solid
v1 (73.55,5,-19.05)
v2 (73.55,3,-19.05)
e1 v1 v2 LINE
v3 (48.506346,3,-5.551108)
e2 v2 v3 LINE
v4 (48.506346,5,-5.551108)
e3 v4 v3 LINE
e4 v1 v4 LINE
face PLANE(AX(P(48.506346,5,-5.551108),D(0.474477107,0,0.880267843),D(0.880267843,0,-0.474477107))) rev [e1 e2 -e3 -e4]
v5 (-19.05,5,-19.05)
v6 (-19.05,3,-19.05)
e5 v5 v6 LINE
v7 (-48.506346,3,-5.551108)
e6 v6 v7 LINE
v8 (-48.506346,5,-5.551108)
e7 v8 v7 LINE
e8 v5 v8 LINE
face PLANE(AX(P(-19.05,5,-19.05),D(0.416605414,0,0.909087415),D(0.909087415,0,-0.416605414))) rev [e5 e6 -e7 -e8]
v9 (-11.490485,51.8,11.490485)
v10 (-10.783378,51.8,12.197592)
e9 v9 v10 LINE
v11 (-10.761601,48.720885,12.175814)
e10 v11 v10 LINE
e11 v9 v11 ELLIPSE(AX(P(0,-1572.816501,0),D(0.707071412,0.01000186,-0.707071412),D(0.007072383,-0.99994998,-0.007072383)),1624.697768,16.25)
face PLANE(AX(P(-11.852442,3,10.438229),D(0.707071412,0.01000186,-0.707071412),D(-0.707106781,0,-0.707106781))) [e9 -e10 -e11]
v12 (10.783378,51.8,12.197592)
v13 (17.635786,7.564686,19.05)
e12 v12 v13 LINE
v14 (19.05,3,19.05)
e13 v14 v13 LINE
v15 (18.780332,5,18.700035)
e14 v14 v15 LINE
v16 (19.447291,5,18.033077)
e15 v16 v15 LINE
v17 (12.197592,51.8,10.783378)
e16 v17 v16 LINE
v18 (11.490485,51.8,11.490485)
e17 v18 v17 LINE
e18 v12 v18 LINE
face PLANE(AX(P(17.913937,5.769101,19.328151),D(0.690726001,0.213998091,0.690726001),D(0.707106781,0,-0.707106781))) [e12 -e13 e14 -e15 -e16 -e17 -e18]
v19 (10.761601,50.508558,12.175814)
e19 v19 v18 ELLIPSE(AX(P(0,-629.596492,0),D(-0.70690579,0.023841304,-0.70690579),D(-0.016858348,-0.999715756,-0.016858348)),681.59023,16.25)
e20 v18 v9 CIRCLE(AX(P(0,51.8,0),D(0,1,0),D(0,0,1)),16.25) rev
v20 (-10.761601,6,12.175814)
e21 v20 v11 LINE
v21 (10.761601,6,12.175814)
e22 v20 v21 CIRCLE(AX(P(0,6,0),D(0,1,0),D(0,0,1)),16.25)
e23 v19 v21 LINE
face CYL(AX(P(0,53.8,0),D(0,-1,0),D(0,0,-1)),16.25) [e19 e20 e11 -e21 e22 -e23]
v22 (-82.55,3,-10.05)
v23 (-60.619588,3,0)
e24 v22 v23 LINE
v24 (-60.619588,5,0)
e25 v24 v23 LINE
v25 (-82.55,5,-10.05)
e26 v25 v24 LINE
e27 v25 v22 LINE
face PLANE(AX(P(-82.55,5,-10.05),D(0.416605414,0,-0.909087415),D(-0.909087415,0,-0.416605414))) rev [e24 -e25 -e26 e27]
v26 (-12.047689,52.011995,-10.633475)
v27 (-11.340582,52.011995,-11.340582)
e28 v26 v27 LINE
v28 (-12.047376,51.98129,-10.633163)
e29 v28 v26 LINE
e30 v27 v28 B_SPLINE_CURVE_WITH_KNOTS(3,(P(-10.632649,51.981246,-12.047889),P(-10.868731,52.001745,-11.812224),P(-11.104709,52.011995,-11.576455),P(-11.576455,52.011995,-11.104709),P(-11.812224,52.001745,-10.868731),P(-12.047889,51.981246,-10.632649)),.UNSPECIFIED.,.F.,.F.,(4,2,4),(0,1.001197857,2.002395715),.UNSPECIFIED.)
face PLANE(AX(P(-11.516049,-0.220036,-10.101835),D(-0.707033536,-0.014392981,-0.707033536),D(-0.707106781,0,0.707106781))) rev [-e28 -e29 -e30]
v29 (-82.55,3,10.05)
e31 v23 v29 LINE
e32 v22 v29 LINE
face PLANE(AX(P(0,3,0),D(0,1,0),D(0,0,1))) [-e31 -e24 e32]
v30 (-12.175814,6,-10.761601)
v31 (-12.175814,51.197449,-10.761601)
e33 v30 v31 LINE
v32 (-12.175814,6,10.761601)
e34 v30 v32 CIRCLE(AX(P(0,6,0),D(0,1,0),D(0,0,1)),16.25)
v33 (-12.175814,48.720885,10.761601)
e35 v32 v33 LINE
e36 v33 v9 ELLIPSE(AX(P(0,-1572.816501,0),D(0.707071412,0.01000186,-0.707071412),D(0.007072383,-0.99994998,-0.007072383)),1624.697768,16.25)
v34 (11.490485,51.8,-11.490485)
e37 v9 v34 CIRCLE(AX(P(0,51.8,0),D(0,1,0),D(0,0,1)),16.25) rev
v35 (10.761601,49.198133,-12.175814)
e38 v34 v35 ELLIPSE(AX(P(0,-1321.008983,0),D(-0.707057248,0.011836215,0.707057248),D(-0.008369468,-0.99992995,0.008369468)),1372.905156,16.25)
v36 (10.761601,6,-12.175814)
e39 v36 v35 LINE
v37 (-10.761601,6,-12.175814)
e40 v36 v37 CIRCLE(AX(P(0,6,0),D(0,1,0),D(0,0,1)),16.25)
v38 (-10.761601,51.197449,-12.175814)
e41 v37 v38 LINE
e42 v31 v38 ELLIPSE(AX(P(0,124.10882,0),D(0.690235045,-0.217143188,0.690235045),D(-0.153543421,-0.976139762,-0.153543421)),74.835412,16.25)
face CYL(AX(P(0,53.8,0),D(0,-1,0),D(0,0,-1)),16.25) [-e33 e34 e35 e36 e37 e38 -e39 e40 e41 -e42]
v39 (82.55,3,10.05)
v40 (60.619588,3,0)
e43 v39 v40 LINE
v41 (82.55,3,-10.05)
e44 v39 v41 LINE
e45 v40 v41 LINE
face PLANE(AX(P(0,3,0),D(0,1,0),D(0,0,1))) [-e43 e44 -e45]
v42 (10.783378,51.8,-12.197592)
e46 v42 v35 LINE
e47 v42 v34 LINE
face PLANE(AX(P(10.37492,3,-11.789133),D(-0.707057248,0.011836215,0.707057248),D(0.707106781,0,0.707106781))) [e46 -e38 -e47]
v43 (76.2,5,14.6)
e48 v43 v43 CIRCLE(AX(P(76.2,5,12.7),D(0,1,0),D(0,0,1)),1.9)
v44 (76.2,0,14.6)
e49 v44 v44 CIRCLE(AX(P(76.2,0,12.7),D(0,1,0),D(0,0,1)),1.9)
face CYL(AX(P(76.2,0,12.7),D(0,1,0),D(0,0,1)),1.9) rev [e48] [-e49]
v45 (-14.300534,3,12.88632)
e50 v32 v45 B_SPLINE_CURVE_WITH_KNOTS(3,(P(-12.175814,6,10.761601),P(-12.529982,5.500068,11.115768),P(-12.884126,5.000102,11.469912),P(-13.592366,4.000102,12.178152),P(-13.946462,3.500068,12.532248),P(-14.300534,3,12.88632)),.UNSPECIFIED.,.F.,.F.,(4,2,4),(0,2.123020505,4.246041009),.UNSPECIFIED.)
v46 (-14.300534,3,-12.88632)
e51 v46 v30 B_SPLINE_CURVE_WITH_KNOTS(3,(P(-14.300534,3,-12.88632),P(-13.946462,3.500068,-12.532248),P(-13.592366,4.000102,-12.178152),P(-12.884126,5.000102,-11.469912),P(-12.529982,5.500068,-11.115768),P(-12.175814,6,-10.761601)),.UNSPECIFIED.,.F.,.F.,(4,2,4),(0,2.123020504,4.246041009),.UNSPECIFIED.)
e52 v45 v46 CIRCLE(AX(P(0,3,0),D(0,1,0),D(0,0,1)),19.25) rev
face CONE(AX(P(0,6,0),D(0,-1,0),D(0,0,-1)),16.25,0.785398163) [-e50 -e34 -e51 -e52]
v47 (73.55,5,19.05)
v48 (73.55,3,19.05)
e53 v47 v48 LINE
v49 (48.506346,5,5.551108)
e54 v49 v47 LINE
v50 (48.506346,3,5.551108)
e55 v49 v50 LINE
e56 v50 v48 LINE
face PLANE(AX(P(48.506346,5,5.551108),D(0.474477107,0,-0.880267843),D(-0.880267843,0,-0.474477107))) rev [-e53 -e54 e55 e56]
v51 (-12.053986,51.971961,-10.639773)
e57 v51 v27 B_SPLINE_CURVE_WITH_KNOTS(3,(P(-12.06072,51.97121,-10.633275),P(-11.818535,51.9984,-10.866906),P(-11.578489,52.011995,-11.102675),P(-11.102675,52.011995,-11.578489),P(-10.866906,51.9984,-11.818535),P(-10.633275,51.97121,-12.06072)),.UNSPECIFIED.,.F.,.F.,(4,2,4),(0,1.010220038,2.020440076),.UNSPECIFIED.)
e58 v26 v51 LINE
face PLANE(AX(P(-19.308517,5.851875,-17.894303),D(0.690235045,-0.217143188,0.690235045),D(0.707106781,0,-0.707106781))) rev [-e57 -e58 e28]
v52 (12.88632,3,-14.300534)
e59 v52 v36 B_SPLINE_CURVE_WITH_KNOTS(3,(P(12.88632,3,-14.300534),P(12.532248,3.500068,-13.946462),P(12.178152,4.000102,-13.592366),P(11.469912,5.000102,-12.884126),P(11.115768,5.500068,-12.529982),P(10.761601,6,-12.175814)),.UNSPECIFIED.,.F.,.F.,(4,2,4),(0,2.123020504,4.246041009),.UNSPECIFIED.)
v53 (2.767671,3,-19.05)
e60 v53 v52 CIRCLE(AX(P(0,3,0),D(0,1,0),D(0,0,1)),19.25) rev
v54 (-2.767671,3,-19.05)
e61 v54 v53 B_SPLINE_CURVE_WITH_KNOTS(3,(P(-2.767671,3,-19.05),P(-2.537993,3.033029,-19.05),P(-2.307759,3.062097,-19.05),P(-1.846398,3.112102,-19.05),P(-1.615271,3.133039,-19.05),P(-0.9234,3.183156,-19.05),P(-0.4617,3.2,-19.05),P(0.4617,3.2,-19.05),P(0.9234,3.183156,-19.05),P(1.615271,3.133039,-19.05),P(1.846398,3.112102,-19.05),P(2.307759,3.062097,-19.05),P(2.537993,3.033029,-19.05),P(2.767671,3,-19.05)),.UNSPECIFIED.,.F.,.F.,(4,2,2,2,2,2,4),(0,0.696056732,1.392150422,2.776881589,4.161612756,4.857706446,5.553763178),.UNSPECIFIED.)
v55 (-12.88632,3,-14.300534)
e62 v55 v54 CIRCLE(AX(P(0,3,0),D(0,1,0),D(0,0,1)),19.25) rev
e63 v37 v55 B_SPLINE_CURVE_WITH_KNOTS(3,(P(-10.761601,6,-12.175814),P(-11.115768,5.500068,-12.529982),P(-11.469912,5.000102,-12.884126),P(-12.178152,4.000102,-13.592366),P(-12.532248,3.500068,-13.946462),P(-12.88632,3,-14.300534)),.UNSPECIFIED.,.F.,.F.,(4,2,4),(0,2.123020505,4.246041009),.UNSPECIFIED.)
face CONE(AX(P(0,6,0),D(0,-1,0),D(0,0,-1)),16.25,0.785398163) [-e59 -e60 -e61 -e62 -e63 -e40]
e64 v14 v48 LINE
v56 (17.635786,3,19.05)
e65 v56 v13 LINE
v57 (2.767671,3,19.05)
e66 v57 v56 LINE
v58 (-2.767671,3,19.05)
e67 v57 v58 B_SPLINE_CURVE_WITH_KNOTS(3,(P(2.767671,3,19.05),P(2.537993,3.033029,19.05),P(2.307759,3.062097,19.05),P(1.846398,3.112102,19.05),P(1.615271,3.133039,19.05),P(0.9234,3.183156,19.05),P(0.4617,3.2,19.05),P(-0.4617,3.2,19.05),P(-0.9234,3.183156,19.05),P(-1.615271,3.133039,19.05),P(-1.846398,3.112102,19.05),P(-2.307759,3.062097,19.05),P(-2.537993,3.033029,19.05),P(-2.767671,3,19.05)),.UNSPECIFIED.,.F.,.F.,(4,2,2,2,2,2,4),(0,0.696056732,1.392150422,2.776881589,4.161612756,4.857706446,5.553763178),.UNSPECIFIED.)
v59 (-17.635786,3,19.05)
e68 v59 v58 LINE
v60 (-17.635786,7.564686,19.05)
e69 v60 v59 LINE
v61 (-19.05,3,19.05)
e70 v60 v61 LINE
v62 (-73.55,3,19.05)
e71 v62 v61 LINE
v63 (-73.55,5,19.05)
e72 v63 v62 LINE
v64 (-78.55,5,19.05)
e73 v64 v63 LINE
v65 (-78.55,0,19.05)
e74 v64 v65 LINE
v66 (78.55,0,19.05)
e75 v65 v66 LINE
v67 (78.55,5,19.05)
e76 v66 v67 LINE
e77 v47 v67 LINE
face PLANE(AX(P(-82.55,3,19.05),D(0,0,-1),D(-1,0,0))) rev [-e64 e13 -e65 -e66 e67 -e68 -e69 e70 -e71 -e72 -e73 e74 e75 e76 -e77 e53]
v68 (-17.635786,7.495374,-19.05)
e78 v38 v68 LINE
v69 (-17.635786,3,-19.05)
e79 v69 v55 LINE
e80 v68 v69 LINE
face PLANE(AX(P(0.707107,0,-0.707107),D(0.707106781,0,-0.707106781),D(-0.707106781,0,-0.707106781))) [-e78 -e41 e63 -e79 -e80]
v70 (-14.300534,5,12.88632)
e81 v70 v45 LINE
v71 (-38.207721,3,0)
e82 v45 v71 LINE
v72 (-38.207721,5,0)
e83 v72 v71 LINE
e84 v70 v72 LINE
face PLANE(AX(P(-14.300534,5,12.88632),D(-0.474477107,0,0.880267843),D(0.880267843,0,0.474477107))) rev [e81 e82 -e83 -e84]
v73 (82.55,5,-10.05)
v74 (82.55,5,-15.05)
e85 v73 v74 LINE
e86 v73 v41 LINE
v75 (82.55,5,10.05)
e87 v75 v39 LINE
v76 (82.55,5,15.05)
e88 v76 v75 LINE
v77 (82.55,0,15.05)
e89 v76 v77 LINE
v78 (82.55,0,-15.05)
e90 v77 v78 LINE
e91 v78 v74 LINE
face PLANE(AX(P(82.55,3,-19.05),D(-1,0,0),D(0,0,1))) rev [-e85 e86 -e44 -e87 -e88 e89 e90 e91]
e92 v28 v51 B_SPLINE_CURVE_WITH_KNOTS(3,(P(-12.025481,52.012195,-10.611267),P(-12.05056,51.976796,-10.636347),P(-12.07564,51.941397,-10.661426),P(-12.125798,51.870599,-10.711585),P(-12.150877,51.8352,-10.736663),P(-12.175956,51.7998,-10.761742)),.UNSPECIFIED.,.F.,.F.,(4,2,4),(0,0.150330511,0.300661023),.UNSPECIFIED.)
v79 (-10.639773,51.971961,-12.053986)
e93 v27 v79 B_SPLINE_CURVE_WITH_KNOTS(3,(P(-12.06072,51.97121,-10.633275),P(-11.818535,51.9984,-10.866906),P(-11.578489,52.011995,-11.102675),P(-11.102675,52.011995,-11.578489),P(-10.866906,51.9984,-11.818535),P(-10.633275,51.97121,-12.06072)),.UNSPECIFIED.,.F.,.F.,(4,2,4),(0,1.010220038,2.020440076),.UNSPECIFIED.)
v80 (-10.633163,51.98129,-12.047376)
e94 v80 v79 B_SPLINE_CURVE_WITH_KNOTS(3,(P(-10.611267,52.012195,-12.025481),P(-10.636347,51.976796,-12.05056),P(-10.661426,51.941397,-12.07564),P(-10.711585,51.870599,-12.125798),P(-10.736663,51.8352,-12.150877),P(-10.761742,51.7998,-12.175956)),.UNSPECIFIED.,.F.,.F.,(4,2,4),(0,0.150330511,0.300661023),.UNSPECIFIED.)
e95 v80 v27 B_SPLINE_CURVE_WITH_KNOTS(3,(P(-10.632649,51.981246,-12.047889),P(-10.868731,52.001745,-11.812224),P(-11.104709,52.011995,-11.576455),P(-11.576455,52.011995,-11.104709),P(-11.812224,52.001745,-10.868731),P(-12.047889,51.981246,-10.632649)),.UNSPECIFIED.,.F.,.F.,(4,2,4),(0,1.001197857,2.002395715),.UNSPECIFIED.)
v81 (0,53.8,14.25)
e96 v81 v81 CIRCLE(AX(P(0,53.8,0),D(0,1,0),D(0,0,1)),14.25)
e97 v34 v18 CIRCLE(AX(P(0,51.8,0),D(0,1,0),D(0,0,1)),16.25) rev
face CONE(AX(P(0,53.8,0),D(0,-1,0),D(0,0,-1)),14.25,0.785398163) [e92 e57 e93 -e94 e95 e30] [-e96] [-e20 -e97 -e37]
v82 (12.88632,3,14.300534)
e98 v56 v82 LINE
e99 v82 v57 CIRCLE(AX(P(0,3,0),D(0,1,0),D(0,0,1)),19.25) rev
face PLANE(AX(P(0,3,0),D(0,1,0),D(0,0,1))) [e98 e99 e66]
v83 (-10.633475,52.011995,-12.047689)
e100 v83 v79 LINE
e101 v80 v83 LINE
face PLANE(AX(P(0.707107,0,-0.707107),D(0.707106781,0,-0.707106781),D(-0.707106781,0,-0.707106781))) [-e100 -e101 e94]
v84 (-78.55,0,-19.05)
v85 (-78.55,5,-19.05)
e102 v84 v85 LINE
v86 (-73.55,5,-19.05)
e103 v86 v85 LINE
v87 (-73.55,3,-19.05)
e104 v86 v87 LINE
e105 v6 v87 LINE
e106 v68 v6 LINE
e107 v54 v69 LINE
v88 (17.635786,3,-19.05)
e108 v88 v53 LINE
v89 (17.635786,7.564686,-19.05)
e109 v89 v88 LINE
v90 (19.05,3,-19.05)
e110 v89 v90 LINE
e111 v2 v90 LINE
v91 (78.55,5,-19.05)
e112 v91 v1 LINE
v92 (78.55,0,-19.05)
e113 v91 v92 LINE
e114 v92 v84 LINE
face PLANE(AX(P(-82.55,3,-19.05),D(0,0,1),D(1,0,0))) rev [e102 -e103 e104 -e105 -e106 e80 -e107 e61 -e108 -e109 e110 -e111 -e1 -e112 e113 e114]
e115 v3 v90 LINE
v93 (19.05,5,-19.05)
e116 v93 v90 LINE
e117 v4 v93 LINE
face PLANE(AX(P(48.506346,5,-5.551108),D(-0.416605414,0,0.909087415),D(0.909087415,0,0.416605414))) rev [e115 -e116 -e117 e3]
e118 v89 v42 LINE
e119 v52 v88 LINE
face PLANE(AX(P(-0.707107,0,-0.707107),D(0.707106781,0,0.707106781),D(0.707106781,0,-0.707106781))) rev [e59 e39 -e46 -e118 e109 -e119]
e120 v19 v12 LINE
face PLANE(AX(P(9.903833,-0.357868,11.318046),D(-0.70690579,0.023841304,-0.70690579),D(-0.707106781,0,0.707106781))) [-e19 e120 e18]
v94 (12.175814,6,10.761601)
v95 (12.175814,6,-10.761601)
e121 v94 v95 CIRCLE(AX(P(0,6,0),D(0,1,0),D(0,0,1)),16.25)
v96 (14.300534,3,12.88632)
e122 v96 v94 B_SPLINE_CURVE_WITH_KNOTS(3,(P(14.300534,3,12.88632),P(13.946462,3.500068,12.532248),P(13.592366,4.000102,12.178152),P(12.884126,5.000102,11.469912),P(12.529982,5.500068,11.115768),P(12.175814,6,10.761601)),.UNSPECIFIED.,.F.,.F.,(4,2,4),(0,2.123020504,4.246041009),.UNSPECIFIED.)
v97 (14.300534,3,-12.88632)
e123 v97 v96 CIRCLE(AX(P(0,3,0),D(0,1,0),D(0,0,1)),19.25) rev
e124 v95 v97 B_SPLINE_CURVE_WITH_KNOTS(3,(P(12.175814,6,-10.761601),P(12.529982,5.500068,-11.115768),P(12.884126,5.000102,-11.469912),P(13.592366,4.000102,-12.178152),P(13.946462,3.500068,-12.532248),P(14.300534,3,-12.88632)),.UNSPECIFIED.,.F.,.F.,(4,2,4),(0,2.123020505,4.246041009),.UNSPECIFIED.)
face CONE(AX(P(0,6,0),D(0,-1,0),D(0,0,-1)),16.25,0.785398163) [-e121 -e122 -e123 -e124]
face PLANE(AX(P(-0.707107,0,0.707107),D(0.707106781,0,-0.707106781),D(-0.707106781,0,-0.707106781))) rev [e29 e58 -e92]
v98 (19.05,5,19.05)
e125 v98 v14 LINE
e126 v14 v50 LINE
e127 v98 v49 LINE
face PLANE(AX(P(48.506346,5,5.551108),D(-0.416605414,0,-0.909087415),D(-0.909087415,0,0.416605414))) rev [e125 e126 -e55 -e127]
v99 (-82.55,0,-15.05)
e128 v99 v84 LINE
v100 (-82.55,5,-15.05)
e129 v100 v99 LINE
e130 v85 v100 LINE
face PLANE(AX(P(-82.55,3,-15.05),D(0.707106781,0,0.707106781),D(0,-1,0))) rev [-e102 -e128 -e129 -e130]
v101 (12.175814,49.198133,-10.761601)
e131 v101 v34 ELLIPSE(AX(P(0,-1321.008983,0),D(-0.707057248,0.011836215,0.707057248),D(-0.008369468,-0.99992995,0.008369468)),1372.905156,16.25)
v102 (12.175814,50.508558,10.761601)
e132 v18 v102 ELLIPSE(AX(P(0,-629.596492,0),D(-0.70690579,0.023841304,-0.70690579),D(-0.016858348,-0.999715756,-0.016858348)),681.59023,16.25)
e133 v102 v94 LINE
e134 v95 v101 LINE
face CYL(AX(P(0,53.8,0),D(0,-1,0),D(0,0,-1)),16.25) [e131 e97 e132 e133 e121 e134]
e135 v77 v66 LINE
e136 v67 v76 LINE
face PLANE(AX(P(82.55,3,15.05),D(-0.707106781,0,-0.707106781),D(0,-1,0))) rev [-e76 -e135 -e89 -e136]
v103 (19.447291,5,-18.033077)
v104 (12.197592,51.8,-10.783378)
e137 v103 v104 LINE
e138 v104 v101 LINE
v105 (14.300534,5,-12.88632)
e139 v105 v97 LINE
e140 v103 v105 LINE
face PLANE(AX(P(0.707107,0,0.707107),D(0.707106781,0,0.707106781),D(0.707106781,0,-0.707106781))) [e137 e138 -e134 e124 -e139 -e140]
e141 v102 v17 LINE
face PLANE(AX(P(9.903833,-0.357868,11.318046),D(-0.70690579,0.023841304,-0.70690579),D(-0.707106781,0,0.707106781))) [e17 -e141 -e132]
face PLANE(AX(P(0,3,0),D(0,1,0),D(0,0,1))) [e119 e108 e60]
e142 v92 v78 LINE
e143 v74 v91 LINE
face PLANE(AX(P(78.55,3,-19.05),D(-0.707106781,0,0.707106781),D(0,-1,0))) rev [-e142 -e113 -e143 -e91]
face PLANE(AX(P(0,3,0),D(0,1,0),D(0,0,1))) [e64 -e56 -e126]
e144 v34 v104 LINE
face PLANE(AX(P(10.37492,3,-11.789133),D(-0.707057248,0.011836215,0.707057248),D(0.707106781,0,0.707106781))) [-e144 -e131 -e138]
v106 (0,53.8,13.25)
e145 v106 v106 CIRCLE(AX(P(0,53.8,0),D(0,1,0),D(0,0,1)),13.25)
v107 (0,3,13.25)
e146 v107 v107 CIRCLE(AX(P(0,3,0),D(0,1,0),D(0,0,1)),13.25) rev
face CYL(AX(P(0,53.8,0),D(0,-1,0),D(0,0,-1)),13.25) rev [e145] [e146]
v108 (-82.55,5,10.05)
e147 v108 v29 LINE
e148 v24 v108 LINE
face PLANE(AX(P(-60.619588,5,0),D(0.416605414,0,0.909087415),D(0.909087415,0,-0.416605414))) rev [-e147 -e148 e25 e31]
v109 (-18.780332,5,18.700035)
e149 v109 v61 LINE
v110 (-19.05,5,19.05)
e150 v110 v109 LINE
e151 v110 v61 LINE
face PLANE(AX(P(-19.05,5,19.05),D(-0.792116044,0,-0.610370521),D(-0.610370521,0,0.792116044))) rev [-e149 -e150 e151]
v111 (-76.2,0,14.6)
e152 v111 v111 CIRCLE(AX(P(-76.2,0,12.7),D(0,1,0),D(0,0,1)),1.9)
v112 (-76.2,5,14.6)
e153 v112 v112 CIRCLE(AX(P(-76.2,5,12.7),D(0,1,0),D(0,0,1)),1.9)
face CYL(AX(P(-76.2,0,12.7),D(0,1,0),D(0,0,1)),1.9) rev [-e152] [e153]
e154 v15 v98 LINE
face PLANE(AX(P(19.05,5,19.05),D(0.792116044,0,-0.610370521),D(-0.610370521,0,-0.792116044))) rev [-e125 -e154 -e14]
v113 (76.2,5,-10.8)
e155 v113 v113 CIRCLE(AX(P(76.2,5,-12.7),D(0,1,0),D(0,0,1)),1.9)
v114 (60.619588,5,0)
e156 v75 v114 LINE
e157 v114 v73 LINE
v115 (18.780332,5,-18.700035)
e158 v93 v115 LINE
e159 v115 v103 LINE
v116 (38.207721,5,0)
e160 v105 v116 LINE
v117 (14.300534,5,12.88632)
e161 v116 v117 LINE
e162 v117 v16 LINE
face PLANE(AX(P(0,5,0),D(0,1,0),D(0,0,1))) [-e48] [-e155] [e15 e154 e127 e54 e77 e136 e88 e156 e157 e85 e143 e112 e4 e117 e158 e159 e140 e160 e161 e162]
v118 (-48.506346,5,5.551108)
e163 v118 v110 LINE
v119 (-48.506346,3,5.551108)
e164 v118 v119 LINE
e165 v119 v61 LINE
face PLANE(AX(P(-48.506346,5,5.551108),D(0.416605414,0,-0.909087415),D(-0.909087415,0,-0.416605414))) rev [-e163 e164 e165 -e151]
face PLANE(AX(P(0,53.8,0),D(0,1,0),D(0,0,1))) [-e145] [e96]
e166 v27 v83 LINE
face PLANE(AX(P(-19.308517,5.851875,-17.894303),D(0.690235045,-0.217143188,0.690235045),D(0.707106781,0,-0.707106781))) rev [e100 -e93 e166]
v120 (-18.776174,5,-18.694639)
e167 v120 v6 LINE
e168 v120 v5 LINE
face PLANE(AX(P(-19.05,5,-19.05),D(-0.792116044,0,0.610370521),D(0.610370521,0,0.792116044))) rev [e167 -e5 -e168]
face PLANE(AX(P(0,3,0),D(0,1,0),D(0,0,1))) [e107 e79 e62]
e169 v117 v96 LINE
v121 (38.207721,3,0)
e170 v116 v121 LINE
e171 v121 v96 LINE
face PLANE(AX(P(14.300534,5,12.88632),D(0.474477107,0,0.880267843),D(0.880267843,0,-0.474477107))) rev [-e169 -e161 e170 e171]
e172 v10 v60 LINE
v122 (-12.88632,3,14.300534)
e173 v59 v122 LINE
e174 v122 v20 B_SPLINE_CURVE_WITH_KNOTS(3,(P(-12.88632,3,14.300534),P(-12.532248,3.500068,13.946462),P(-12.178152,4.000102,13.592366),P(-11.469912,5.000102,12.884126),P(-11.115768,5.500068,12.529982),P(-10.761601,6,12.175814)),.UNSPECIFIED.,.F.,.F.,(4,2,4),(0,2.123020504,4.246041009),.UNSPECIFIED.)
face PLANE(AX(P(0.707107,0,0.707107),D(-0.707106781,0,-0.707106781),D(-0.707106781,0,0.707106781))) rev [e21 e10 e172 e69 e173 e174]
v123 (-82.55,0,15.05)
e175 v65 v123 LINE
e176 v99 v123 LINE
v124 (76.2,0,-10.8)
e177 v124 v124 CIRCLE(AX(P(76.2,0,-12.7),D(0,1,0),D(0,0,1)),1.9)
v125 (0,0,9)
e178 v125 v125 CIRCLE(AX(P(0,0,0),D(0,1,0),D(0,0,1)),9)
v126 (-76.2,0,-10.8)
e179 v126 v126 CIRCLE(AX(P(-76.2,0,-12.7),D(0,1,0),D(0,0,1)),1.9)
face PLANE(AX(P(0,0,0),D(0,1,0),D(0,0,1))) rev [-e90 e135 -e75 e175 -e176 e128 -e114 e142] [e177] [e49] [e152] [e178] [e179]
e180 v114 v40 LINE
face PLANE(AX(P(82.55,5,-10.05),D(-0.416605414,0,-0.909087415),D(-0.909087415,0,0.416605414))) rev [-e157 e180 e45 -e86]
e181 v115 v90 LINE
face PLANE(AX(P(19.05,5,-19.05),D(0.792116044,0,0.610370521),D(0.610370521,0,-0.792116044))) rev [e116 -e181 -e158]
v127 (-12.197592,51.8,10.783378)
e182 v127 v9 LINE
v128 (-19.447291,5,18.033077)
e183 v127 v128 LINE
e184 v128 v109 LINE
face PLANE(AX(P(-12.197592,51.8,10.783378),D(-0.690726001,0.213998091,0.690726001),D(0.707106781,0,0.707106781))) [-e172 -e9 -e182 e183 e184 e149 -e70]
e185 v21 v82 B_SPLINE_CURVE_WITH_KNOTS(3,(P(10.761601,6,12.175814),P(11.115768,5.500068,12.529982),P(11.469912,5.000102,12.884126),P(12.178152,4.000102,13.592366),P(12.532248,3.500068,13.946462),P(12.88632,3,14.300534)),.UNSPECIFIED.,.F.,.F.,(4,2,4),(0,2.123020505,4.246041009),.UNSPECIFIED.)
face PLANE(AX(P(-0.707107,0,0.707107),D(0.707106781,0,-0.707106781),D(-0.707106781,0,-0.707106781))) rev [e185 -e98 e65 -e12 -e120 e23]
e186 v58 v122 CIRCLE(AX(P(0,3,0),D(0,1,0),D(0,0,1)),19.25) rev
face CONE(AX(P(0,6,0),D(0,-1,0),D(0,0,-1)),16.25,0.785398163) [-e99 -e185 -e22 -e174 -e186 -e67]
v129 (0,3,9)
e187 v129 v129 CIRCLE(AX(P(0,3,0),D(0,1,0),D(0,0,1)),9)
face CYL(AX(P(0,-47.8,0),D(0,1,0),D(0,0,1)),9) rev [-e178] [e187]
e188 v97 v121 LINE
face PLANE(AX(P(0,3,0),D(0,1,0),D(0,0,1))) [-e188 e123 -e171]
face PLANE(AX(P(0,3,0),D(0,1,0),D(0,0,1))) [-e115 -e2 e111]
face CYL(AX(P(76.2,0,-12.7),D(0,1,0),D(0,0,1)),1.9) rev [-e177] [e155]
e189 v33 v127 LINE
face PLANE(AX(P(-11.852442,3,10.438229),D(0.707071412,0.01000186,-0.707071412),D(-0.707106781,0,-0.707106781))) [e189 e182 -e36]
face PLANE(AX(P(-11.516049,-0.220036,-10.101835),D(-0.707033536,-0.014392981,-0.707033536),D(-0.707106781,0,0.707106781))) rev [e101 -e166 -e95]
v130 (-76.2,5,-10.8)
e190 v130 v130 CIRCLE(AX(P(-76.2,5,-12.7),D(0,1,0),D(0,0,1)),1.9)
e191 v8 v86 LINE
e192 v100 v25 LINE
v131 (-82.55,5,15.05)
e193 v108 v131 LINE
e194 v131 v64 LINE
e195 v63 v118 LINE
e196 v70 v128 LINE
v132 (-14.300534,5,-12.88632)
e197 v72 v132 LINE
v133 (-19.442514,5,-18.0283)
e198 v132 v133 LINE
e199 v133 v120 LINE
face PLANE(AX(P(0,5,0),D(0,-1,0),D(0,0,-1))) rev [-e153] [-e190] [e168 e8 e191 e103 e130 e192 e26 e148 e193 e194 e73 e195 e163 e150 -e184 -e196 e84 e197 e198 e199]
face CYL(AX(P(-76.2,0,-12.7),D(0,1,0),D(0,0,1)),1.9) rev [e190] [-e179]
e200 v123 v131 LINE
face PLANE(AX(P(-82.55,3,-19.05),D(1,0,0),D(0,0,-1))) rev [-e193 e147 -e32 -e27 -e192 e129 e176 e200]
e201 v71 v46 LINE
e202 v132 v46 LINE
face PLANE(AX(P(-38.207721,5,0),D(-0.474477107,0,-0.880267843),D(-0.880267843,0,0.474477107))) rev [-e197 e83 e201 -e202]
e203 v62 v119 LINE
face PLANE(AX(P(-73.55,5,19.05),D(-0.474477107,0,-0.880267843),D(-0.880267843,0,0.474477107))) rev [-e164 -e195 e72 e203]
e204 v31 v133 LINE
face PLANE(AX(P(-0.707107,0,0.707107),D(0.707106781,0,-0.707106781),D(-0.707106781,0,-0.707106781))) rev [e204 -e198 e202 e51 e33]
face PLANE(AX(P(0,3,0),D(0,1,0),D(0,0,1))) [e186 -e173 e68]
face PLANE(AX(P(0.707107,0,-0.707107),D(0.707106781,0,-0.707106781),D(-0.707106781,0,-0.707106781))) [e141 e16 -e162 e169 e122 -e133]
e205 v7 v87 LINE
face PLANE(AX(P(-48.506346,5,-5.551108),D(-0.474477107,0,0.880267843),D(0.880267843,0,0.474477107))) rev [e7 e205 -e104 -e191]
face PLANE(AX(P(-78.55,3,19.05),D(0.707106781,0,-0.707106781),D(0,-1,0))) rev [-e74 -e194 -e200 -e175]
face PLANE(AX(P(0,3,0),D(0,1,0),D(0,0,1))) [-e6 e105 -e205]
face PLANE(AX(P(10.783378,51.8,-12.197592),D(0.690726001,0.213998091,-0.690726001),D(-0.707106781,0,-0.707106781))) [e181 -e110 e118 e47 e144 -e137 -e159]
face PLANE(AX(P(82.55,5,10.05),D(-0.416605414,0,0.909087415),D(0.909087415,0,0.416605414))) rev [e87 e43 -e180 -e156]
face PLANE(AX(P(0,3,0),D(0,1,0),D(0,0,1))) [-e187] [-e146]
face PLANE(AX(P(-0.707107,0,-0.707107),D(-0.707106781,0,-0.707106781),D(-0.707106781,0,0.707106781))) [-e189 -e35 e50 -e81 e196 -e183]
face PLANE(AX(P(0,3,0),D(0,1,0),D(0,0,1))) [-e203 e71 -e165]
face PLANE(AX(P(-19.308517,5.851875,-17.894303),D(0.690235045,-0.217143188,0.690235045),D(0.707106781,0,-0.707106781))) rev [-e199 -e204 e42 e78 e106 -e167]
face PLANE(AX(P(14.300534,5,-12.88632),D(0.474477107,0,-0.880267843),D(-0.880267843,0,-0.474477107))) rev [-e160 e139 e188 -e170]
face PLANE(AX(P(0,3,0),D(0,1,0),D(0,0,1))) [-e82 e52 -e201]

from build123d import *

# Parameters (mm, degrees)
SKETCH1_W                = 165.1
SKETCH1_H                = 38.1
BOSS_EXTRUDE1_DEPTH      = 3
SKETCH2_R                = 1.9
CUT_EXTRUDE1_DEPTH       = 3
CHAMFER1_SIZE            = 4
SKETCH3_R                = 16.25
SKETCH3_R_2              = 13.25
BOSS_EXTRUDE2_DEPTH      = 50.8
SKETCH4_R                = 9
CUT_EXTRUDE2_DEPTH       = 50.8
CHAMFER2_SIZE            = 2
BOSS_EXTRUDE5_DEPTH      = 1
BOSS_EXTRUDE5_DEPTH_BACK = 1
BOSS_EXTRUDE6_DEPTH      = 1
BOSS_EXTRUDE6_DEPTH_BACK = 1
SKETCH10_W               = 48.027930054
SKETCH10_H               = 3.446227712
SKETCH10_W_2             = 45.229873501
SKETCH10_H_2             = 2.308850273
CUT_EXTRUDE3_DEPTH       = 51
CHAMFER3_SIZE            = 3
BOSS_EXTRUDE7_START      = 2
SKETCH12_R               = 1.9
BOSS_EXTRUDE7_DEPTH      = 2


with BuildPart() as part:
    # Sketch1 → Boss-Extrude1 (new body)
    with BuildSketch(Plane(origin=(0, 0, 0), x_dir=(1, 0, 0), z_dir=(0, 1, 0))):
        Rectangle(SKETCH1_W, SKETCH1_H)
    extrude(amount=BOSS_EXTRUDE1_DEPTH)

    # Sketch2 → Cut-Extrude1 (cut)
    with BuildSketch(Plane(origin=(0, 3, 0), x_dir=(1, 0, 0), z_dir=(0, 1, 0))):
        with Locations(Location((-76.2, 12.7, 0), (0, 0, 270))):
            Circle(SKETCH2_R)
        with Locations(Location((-76.2, -12.7, 0), (0, 0, 270))):
            Circle(SKETCH2_R)
        with Locations(Location((76.2, 12.7, 0), (0, 0, 270))):
            Circle(SKETCH2_R)
        with Locations(Location((76.2, -12.7, 0), (0, 0, 270))):
            Circle(SKETCH2_R)
    extrude(amount=-CUT_EXTRUDE1_DEPTH, mode=Mode.SUBTRACT)

    # Chamfer1
    chamfer1_edges = [part.edges().sort_by_distance(p)[0] for p in [
        (82.55, 1.5, 19.05),
        (-82.55, 1.5, 19.05),
        (-82.55, 1.5, -19.05),
        (82.55, 1.5, -19.05),
    ]]
    chamfer(chamfer1_edges, length=CHAMFER1_SIZE)

    # Sketch3 → Boss-Extrude2 (add)
    with BuildSketch(Plane(origin=(0, 3, 0), x_dir=(1, 0, 0), z_dir=(0, 1, 0))):
        with Locations(Location((0, 0, 0), (0, 0, 270))):
            Circle(SKETCH3_R)
        with Locations(Location((0, 0, 0), (0, 0, 270))):
            Circle(SKETCH3_R_2, mode=Mode.SUBTRACT)
    extrude(amount=BOSS_EXTRUDE2_DEPTH)

    # Sketch4 → Cut-Extrude2 (cut)
    with BuildSketch(Plane(origin=(0, 3, 0), x_dir=(1, 0, 0), z_dir=(0, 1, 0))):
        with Locations(Location((0, 0, 0), (0, 0, 270))):
            Circle(SKETCH4_R)
    extrude(amount=-CUT_EXTRUDE2_DEPTH, mode=Mode.SUBTRACT)

    # Chamfer2
    chamfer2_edges = [part.edges().sort_by_distance(p)[0] for p in [
        (0, 53.8, -16.25),
    ]]
    chamfer(chamfer2_edges, length=CHAMFER2_SIZE)

    # Sketch8 → Boss-Extrude5 (add, two sides: drawn at the far end of the back side and taken through both)
    with BuildSketch(Plane(origin=(0, 0, 0), x_dir=(0.7071067811865465, 0, -0.7071067811865486), z_dir=(0.7071067811865486, 0, 0.7071067811865465)).offset(-BOSS_EXTRUDE5_DEPTH_BACK)):
        Polygon((-16.25, 51.8), (-26.940768363, 3), (-15.761884805, 3), align=None)
        Polygon((16.25, 51.8), (26.940768363, 3), (15.672352265, 3), align=None)
    extrude(amount=BOSS_EXTRUDE5_DEPTH + BOSS_EXTRUDE5_DEPTH_BACK)

    # Sketch9 → Boss-Extrude6 (add, two sides: drawn at the far end of the back side and taken through both)
    with BuildSketch(Plane(origin=(0, 0, 0), x_dir=(-0.7071067811865513, 0, -0.7071067811865437), z_dir=(0.7071067811865437, 0, -0.7071067811865513)).offset(-BOSS_EXTRUDE6_DEPTH_BACK)):
        Polygon((16.03800498, 52.01199502), (26.940768363, 3), (15.332503188, 3), align=None)
        Polygon((-15.086213557, 3), (-16.25, 51.8), (-26.940768363, 3), align=None)
    extrude(amount=BOSS_EXTRUDE6_DEPTH + BOSS_EXTRUDE6_DEPTH_BACK)

    # Sketch10 → Cut-Extrude3 (cut)
    with BuildSketch(Plane.XZ):
        with Locations((0.613627604, 20.773113856)):
            Rectangle(SKETCH10_W, SKETCH10_H)
        with Locations((-0.375624438, -20.204425136)):
            Rectangle(SKETCH10_W_2, SKETCH10_H_2)
    extrude(amount=-CUT_EXTRUDE3_DEPTH, mode=Mode.SUBTRACT)

    # Chamfer3
    # the kernel refuses this chamfer: 3 mm, written as the material it adds along each edge
    with BuildSketch(Plane(origin=(0, 3, 0), x_dir=(-0.363517845184437, 0, -0.9315872349020589), z_dir=(0.9315872349020589, 0, -0.363517845184437))) as chamfer3_piece_1:
        Polygon((16.25 + CHAMFER3_SIZE, 0), (16.25, CHAMFER3_SIZE), (16.25, 0), align=None)
    revolve(axis=Axis((0, 3, 0), (0, 1, 0)), revolution_arc=137.36720641)
    with BuildSketch(Plane(origin=(0, 3, 0), x_dir=(0.3635178451844628, 0, 0.9315872349020488), z_dir=(-0.9315872349020488, 0, 0.3635178451844628))) as chamfer3_piece_2:
        Polygon((16.25 + CHAMFER3_SIZE, 0), (16.25, CHAMFER3_SIZE), (16.25, 0), align=None)
    revolve(axis=Axis((0, 3, 0), (0, 1, 0)), revolution_arc=137.36720641)
    with BuildSketch(Plane(origin=(0, 3, 0), x_dir=(-0.9315872349020518, 0, 0.363517845184455), z_dir=(-0.363517845184455, 0, -0.9315872349020518))) as chamfer3_piece_3_section:
        Polygon((16.25, CHAMFER3_SIZE), (16.25 + CHAMFER3_SIZE, 0), (16.25, 0), align=None)
    chamfer3_piece_3 = revolve(axis=Axis((0, 3, 0), (0, 1, 0)), revolution_arc=137.36720641, mode=Mode.PRIVATE)
    chamfer3_piece_3 = split(chamfer3_piece_3, bisect_by=Plane(origin=(-14.04599825, 3.973842114, 19.05), z_dir=(0, 0, -1)), keep=Keep.TOP, mode=Mode.PRIVATE)
    add(chamfer3_piece_3)
    with BuildSketch(Plane(origin=(0, 3, 0), x_dir=(0.9315872349020476, 0, -0.3635178451844656), z_dir=(0.3635178451844656, 0, 0.9315872349020476))) as chamfer3_piece_4_section:
        Polygon((16.25 + CHAMFER3_SIZE, 0), (16.25, CHAMFER3_SIZE), (16.25, 0), align=None)
    chamfer3_piece_4 = revolve(axis=Axis((0, 3, 0), (0, 1, 0)), revolution_arc=137.36720641, mode=Mode.PRIVATE)
    chamfer3_piece_4 = split(chamfer3_piece_4, bisect_by=Plane(origin=(14.045998398, 3.973842011, -19.05), z_dir=(0, 0, 1)), keep=Keep.TOP, mode=Mode.PRIVATE)
    add(chamfer3_piece_4)

    # Sketch12 → Boss-Extrude7 (add)
    # profile 1 of 2: a face of its own
    with BuildSketch(Plane(origin=(0, 3, 0), x_dir=(1, 0, 0), z_dir=(0, 1, 0)).offset(BOSS_EXTRUDE7_START)):
        Polygon((-19.05, 19.05), (-48.506345534, 5.551107795), (-73.55, 19.05), (-78.55, 19.05), (-82.55, 15.05), (-82.55, 10.05), (-60.619587629, 0), (-82.55, -10.05), (-82.55, -15.05), (-78.55, -19.05), (-73.55, -19.05), (-48.506345534, -5.551107795), (-19.05, -19.05), (-14.300533501, -12.886319939), (-38.207720772, 0), (-14.300533501, 12.886319939), align=None)
        with Locations(Location((-76.2, 12.7, 0), (0, 0, 270))):
            Circle(SKETCH12_R, mode=Mode.SUBTRACT)
        with Locations(Location((-76.2, -12.7, 0), (0, 0, 270))):
            Circle(SKETCH12_R, mode=Mode.SUBTRACT)
    # profile 2 of 2: a face of its own
    with BuildSketch(Plane(origin=(0, 3, 0), x_dir=(1, 0, 0), z_dir=(0, 1, 0)).offset(BOSS_EXTRUDE7_START)):
        Polygon((14.300533501, 12.886319939), (38.207720772, 0), (14.300533501, -12.886319939), (19.05, -19.05), (48.506345534, -5.551107795), (73.55, -19.05), (78.55, -19.05), (82.55, -15.05), (82.55, -10.05), (60.619587629, 0), (82.55, 10.05), (82.55, 15.05), (78.55, 19.05), (73.55, 19.05), (48.506345534, 5.551107795), (19.05, 19.05), align=None)
        with Locations(Location((76.2, 12.7, 0), (0, 0, 270))):
            Circle(SKETCH12_R, mode=Mode.SUBTRACT)
        with Locations(Location((76.2, -12.7, 0), (0, 0, 270))):
            Circle(SKETCH12_R, mode=Mode.SUBTRACT)
    extrude(amount=-BOSS_EXTRUDE7_DEPTH)


solid = part.part
